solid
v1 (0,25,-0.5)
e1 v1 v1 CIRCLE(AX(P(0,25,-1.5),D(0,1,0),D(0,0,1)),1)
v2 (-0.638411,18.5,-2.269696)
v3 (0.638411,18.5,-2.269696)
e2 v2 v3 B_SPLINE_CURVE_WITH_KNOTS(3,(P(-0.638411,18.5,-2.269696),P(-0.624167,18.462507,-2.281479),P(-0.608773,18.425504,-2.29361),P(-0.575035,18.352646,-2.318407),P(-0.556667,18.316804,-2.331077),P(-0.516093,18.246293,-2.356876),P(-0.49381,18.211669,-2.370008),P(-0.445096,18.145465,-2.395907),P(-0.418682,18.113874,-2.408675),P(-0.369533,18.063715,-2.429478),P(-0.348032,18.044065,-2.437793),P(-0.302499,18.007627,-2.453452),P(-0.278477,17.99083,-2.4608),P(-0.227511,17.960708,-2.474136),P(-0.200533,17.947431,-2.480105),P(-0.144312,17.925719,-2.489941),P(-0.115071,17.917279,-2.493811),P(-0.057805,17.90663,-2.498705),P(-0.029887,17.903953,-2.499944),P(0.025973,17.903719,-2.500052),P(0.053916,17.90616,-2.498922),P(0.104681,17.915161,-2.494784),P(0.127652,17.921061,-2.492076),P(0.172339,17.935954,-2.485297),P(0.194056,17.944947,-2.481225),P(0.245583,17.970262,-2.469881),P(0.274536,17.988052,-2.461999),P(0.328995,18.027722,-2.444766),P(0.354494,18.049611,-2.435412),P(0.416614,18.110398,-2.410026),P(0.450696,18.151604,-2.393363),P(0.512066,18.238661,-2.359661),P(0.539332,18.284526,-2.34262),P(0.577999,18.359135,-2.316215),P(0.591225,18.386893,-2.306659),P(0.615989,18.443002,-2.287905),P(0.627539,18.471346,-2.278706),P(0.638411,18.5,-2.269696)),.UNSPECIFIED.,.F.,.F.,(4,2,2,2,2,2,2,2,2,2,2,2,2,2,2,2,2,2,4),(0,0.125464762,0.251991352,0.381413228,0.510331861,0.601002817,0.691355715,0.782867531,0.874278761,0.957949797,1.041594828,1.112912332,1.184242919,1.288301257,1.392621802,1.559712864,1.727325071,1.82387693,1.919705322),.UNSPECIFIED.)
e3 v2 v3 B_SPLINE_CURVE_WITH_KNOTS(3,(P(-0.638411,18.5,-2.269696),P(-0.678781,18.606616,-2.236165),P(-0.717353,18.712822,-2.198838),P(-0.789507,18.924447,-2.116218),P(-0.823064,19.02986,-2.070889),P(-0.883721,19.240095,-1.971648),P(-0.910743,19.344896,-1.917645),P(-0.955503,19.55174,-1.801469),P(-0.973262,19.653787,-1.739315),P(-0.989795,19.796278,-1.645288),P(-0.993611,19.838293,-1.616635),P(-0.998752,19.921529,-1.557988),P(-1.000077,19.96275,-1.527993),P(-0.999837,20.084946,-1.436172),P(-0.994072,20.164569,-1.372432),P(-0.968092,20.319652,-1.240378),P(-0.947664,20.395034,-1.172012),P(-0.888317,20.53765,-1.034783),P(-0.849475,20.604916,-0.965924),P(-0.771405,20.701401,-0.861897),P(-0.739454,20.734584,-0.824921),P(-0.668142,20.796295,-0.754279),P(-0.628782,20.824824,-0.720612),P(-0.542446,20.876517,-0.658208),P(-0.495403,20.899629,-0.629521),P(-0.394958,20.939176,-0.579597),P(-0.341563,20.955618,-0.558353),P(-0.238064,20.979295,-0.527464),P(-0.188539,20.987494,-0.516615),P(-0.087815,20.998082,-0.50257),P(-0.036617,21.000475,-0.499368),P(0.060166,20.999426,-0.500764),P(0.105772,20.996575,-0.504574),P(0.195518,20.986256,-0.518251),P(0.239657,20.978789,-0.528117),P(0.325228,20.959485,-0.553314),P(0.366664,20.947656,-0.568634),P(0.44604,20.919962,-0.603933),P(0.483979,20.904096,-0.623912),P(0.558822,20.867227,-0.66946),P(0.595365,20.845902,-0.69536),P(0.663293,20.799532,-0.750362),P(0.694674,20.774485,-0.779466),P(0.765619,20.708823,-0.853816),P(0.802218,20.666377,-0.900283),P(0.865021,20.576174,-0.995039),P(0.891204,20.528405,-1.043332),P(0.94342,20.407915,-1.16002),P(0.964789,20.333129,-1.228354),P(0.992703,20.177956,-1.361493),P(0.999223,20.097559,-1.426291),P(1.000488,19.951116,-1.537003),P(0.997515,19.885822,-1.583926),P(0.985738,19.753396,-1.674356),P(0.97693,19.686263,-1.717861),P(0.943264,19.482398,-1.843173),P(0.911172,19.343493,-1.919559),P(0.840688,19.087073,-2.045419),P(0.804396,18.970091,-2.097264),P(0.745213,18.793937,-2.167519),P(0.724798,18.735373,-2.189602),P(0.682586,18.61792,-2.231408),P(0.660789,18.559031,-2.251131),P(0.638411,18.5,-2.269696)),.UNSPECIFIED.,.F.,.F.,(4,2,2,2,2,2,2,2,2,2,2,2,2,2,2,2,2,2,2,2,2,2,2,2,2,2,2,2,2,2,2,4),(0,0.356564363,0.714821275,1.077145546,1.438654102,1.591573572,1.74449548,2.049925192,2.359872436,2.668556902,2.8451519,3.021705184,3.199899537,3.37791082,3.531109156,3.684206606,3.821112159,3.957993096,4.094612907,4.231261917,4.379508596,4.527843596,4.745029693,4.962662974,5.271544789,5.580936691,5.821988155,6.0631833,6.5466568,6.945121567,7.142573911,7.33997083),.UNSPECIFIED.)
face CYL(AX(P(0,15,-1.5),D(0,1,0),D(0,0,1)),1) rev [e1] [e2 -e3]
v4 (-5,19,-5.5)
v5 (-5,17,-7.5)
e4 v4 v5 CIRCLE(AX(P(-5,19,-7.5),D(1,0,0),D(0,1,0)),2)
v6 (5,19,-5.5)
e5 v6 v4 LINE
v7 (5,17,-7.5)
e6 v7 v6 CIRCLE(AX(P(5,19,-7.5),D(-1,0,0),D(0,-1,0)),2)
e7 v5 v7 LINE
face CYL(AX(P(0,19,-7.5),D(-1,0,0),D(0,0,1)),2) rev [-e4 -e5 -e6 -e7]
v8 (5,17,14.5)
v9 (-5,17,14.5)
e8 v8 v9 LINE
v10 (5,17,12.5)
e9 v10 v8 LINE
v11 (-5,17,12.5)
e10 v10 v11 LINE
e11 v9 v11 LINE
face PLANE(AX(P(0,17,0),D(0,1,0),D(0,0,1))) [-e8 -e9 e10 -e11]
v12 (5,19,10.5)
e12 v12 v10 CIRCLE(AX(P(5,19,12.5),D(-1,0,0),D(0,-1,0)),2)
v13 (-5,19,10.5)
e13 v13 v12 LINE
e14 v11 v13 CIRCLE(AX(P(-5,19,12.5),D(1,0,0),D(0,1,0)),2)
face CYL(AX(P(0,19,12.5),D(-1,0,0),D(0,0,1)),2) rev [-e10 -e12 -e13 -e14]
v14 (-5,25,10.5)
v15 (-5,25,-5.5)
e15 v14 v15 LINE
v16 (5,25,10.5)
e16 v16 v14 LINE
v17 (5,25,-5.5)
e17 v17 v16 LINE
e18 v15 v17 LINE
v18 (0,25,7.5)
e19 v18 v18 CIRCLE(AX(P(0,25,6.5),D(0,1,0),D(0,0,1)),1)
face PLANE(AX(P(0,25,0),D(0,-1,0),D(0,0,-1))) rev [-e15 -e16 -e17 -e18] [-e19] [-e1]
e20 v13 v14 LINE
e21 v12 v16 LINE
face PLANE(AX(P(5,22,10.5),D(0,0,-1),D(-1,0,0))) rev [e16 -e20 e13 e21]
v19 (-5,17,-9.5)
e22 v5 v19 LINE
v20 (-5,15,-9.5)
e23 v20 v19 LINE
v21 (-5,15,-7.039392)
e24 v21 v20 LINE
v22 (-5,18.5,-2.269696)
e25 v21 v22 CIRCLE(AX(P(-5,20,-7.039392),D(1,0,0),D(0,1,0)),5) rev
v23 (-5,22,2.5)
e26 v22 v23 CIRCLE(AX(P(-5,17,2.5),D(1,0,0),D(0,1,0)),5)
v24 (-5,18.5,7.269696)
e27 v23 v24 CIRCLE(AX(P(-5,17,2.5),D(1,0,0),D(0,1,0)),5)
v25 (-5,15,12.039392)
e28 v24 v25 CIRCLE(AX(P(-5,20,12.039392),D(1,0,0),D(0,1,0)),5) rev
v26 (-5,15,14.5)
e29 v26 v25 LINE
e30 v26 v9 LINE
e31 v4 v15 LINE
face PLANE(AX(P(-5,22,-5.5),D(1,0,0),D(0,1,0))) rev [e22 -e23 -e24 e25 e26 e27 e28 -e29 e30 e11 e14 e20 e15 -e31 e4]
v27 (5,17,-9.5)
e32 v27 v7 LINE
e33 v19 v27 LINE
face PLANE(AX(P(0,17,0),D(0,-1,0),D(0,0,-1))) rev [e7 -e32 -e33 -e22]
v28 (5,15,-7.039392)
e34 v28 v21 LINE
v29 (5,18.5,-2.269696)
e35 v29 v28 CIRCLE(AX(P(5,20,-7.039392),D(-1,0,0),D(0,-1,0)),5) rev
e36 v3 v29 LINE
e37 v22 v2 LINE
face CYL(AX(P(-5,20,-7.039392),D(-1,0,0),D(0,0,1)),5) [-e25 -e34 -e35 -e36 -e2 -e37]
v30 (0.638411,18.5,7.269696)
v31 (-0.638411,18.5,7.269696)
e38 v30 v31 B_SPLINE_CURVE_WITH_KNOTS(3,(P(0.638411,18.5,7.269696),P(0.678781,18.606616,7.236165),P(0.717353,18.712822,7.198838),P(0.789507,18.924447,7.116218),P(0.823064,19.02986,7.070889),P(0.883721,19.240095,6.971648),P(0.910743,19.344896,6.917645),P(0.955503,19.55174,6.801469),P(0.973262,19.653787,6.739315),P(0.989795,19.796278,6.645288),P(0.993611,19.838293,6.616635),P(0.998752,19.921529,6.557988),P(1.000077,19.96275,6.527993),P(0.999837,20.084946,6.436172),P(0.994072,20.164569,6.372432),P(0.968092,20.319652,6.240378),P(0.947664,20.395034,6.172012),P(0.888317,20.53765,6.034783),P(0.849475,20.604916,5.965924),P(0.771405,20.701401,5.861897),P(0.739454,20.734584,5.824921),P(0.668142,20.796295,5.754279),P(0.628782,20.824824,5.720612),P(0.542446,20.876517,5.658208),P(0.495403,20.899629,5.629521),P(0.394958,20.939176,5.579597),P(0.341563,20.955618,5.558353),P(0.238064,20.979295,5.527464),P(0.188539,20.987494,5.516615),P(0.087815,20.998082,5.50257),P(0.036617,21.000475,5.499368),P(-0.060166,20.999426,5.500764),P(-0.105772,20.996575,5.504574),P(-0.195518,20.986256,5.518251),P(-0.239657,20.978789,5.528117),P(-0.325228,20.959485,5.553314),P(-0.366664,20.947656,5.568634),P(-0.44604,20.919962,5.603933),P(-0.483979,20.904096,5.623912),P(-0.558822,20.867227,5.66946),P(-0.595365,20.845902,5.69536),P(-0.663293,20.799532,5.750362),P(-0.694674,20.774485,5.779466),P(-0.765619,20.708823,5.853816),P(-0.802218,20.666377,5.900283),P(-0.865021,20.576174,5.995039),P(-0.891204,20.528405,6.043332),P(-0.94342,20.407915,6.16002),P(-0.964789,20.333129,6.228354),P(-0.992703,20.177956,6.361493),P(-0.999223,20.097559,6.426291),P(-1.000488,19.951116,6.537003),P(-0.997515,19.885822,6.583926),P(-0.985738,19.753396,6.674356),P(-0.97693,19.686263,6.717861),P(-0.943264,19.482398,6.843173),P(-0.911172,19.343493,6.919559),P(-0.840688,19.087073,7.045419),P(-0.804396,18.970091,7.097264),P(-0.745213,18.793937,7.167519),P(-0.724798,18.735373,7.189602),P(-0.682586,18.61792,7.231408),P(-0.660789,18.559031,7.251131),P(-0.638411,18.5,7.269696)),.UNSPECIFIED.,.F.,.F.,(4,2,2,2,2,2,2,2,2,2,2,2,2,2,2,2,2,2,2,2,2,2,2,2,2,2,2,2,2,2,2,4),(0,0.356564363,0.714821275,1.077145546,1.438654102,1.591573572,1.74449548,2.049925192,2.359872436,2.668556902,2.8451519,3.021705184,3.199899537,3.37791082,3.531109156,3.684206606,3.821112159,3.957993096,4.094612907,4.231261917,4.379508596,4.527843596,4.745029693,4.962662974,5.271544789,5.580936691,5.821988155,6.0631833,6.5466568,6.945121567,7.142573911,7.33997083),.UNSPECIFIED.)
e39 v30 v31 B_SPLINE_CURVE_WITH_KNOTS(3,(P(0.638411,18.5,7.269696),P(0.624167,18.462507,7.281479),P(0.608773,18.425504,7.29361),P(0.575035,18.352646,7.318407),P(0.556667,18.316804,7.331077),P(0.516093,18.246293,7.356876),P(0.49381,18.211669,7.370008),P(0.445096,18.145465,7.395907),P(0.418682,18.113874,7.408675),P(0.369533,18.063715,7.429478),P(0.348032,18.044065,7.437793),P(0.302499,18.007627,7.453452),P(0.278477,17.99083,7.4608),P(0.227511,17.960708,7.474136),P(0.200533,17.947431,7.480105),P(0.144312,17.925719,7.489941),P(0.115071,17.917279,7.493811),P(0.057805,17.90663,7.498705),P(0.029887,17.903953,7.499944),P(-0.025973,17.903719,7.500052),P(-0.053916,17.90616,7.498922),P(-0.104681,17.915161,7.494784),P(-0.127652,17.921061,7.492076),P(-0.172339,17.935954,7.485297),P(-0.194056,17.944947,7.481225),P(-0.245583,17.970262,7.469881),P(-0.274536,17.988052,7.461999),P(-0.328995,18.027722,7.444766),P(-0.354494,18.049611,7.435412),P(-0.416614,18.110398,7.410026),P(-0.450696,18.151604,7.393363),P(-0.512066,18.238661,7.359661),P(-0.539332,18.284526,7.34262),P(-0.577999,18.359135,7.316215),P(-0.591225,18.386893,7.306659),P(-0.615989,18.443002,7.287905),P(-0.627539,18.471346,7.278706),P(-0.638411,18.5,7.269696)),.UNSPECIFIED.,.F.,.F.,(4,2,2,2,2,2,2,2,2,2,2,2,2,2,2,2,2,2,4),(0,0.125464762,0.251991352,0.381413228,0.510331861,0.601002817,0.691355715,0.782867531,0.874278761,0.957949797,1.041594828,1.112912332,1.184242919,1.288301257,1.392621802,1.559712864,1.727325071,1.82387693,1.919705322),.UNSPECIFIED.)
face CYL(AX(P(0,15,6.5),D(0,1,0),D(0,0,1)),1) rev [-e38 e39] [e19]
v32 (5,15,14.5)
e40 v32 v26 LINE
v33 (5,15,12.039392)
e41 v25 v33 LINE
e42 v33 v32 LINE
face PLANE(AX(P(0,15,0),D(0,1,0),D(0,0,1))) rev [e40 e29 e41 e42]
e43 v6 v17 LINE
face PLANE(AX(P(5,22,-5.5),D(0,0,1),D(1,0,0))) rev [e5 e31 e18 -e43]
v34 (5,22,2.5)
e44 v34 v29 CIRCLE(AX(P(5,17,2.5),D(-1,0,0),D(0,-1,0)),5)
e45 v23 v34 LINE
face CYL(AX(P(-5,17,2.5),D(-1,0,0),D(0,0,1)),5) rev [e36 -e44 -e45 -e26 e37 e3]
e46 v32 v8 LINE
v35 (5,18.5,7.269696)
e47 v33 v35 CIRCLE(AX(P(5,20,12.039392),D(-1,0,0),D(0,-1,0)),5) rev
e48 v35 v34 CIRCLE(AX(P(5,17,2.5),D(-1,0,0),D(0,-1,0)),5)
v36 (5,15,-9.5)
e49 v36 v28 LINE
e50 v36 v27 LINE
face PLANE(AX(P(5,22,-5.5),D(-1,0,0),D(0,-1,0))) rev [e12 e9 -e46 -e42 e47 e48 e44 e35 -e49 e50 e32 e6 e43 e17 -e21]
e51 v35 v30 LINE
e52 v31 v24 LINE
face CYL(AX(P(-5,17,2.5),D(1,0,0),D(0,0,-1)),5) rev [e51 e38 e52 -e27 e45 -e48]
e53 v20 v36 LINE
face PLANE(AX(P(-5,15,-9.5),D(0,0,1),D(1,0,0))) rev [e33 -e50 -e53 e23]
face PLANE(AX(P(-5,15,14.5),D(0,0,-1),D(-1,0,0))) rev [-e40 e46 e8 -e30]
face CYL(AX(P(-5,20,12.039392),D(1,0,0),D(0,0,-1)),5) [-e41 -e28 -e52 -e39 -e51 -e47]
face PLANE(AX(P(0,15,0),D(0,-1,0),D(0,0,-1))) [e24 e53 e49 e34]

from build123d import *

# Parameters (mm, degrees)
SKETCH1_W           = 10
SKETCH1_H           = 16
BOSS_EXTRUDE1_DEPTH = 3
SKETCH2_W           = 10
SKETCH2_H           = 3
BOSS_EXTRUDE2_DEPTH = 5
SKETCH3_W           = 10
SKETCH3_H           = 7
BOSS_EXTRUDE3_DEPTH = 2
FILLET1_R           = 5
FILLET2_R           = 5
FILLET3_R           = 2
SKETCH4_R           = 1
CUT_EXTRUDE1_DEPTH  = 19.309833585


with BuildPart() as part:
    # Sketch1 → Boss-Extrude1 (new body)
    with BuildSketch(Plane.XZ.offset(-25)):
        with Locations((0, 2.5)):
            Rectangle(SKETCH1_W, SKETCH1_H)
    extrude(amount=BOSS_EXTRUDE1_DEPTH)

    # Sketch2 → Boss-Extrude2 (add)
    with BuildSketch(Plane.XZ.offset(-22)):
        with Locations((0, -4)):
            Rectangle(SKETCH2_W, SKETCH2_H)
        with Locations((0, 9)):
            Rectangle(SKETCH2_W, SKETCH2_H)
    extrude(amount=BOSS_EXTRUDE2_DEPTH)

    # Sketch3 → Boss-Extrude3 (add)
    with BuildSketch(Plane.XZ.offset(-17)):
        with Locations((0, 11)):
            Rectangle(SKETCH3_W, SKETCH3_H)
        with Locations((0, -6)):
            Rectangle(SKETCH3_W, SKETCH3_H)
    extrude(amount=BOSS_EXTRUDE3_DEPTH)

    # Fillet1
    fillet1_edges = [part.edges().sort_by_distance(p)[0] for p in [
        (0, 22, 7.5),
        (0, 22, -2.5),
    ]]
    fillet(fillet1_edges, radius=FILLET1_R - 0.0001)  # a hair under: the kernel refuses the full size

    # Fillet2
    fillet2_edges = [part.edges().sort_by_distance(p)[0] for p in [
        (0, 15, -2.5),
        (0, 15, 7.5),
    ]]
    fillet(fillet2_edges, radius=FILLET2_R)

    # Fillet3
    fillet3_edges = [part.edges().sort_by_distance(p)[0] for p in [
        (0, 17, -5.5),
        (0, 17, 10.5),
    ]]
    fillet(fillet3_edges, radius=FILLET3_R)

    # Sketch4 → Cut-Extrude1 (cut, through all)
    with BuildSketch(Plane(origin=(0, 25, 0), x_dir=(1, 0, 0), z_dir=(0, 1, 0))):
        with Locations(Location((0, 1.5, 0), (0, 0, 270))):
            Circle(SKETCH4_R)
        with Locations(Location((0, -6.5, 0), (0, 0, 270))):
            Circle(SKETCH4_R)
    extrude(amount=-CUT_EXTRUDE1_DEPTH, mode=Mode.SUBTRACT)


solid = part.part
